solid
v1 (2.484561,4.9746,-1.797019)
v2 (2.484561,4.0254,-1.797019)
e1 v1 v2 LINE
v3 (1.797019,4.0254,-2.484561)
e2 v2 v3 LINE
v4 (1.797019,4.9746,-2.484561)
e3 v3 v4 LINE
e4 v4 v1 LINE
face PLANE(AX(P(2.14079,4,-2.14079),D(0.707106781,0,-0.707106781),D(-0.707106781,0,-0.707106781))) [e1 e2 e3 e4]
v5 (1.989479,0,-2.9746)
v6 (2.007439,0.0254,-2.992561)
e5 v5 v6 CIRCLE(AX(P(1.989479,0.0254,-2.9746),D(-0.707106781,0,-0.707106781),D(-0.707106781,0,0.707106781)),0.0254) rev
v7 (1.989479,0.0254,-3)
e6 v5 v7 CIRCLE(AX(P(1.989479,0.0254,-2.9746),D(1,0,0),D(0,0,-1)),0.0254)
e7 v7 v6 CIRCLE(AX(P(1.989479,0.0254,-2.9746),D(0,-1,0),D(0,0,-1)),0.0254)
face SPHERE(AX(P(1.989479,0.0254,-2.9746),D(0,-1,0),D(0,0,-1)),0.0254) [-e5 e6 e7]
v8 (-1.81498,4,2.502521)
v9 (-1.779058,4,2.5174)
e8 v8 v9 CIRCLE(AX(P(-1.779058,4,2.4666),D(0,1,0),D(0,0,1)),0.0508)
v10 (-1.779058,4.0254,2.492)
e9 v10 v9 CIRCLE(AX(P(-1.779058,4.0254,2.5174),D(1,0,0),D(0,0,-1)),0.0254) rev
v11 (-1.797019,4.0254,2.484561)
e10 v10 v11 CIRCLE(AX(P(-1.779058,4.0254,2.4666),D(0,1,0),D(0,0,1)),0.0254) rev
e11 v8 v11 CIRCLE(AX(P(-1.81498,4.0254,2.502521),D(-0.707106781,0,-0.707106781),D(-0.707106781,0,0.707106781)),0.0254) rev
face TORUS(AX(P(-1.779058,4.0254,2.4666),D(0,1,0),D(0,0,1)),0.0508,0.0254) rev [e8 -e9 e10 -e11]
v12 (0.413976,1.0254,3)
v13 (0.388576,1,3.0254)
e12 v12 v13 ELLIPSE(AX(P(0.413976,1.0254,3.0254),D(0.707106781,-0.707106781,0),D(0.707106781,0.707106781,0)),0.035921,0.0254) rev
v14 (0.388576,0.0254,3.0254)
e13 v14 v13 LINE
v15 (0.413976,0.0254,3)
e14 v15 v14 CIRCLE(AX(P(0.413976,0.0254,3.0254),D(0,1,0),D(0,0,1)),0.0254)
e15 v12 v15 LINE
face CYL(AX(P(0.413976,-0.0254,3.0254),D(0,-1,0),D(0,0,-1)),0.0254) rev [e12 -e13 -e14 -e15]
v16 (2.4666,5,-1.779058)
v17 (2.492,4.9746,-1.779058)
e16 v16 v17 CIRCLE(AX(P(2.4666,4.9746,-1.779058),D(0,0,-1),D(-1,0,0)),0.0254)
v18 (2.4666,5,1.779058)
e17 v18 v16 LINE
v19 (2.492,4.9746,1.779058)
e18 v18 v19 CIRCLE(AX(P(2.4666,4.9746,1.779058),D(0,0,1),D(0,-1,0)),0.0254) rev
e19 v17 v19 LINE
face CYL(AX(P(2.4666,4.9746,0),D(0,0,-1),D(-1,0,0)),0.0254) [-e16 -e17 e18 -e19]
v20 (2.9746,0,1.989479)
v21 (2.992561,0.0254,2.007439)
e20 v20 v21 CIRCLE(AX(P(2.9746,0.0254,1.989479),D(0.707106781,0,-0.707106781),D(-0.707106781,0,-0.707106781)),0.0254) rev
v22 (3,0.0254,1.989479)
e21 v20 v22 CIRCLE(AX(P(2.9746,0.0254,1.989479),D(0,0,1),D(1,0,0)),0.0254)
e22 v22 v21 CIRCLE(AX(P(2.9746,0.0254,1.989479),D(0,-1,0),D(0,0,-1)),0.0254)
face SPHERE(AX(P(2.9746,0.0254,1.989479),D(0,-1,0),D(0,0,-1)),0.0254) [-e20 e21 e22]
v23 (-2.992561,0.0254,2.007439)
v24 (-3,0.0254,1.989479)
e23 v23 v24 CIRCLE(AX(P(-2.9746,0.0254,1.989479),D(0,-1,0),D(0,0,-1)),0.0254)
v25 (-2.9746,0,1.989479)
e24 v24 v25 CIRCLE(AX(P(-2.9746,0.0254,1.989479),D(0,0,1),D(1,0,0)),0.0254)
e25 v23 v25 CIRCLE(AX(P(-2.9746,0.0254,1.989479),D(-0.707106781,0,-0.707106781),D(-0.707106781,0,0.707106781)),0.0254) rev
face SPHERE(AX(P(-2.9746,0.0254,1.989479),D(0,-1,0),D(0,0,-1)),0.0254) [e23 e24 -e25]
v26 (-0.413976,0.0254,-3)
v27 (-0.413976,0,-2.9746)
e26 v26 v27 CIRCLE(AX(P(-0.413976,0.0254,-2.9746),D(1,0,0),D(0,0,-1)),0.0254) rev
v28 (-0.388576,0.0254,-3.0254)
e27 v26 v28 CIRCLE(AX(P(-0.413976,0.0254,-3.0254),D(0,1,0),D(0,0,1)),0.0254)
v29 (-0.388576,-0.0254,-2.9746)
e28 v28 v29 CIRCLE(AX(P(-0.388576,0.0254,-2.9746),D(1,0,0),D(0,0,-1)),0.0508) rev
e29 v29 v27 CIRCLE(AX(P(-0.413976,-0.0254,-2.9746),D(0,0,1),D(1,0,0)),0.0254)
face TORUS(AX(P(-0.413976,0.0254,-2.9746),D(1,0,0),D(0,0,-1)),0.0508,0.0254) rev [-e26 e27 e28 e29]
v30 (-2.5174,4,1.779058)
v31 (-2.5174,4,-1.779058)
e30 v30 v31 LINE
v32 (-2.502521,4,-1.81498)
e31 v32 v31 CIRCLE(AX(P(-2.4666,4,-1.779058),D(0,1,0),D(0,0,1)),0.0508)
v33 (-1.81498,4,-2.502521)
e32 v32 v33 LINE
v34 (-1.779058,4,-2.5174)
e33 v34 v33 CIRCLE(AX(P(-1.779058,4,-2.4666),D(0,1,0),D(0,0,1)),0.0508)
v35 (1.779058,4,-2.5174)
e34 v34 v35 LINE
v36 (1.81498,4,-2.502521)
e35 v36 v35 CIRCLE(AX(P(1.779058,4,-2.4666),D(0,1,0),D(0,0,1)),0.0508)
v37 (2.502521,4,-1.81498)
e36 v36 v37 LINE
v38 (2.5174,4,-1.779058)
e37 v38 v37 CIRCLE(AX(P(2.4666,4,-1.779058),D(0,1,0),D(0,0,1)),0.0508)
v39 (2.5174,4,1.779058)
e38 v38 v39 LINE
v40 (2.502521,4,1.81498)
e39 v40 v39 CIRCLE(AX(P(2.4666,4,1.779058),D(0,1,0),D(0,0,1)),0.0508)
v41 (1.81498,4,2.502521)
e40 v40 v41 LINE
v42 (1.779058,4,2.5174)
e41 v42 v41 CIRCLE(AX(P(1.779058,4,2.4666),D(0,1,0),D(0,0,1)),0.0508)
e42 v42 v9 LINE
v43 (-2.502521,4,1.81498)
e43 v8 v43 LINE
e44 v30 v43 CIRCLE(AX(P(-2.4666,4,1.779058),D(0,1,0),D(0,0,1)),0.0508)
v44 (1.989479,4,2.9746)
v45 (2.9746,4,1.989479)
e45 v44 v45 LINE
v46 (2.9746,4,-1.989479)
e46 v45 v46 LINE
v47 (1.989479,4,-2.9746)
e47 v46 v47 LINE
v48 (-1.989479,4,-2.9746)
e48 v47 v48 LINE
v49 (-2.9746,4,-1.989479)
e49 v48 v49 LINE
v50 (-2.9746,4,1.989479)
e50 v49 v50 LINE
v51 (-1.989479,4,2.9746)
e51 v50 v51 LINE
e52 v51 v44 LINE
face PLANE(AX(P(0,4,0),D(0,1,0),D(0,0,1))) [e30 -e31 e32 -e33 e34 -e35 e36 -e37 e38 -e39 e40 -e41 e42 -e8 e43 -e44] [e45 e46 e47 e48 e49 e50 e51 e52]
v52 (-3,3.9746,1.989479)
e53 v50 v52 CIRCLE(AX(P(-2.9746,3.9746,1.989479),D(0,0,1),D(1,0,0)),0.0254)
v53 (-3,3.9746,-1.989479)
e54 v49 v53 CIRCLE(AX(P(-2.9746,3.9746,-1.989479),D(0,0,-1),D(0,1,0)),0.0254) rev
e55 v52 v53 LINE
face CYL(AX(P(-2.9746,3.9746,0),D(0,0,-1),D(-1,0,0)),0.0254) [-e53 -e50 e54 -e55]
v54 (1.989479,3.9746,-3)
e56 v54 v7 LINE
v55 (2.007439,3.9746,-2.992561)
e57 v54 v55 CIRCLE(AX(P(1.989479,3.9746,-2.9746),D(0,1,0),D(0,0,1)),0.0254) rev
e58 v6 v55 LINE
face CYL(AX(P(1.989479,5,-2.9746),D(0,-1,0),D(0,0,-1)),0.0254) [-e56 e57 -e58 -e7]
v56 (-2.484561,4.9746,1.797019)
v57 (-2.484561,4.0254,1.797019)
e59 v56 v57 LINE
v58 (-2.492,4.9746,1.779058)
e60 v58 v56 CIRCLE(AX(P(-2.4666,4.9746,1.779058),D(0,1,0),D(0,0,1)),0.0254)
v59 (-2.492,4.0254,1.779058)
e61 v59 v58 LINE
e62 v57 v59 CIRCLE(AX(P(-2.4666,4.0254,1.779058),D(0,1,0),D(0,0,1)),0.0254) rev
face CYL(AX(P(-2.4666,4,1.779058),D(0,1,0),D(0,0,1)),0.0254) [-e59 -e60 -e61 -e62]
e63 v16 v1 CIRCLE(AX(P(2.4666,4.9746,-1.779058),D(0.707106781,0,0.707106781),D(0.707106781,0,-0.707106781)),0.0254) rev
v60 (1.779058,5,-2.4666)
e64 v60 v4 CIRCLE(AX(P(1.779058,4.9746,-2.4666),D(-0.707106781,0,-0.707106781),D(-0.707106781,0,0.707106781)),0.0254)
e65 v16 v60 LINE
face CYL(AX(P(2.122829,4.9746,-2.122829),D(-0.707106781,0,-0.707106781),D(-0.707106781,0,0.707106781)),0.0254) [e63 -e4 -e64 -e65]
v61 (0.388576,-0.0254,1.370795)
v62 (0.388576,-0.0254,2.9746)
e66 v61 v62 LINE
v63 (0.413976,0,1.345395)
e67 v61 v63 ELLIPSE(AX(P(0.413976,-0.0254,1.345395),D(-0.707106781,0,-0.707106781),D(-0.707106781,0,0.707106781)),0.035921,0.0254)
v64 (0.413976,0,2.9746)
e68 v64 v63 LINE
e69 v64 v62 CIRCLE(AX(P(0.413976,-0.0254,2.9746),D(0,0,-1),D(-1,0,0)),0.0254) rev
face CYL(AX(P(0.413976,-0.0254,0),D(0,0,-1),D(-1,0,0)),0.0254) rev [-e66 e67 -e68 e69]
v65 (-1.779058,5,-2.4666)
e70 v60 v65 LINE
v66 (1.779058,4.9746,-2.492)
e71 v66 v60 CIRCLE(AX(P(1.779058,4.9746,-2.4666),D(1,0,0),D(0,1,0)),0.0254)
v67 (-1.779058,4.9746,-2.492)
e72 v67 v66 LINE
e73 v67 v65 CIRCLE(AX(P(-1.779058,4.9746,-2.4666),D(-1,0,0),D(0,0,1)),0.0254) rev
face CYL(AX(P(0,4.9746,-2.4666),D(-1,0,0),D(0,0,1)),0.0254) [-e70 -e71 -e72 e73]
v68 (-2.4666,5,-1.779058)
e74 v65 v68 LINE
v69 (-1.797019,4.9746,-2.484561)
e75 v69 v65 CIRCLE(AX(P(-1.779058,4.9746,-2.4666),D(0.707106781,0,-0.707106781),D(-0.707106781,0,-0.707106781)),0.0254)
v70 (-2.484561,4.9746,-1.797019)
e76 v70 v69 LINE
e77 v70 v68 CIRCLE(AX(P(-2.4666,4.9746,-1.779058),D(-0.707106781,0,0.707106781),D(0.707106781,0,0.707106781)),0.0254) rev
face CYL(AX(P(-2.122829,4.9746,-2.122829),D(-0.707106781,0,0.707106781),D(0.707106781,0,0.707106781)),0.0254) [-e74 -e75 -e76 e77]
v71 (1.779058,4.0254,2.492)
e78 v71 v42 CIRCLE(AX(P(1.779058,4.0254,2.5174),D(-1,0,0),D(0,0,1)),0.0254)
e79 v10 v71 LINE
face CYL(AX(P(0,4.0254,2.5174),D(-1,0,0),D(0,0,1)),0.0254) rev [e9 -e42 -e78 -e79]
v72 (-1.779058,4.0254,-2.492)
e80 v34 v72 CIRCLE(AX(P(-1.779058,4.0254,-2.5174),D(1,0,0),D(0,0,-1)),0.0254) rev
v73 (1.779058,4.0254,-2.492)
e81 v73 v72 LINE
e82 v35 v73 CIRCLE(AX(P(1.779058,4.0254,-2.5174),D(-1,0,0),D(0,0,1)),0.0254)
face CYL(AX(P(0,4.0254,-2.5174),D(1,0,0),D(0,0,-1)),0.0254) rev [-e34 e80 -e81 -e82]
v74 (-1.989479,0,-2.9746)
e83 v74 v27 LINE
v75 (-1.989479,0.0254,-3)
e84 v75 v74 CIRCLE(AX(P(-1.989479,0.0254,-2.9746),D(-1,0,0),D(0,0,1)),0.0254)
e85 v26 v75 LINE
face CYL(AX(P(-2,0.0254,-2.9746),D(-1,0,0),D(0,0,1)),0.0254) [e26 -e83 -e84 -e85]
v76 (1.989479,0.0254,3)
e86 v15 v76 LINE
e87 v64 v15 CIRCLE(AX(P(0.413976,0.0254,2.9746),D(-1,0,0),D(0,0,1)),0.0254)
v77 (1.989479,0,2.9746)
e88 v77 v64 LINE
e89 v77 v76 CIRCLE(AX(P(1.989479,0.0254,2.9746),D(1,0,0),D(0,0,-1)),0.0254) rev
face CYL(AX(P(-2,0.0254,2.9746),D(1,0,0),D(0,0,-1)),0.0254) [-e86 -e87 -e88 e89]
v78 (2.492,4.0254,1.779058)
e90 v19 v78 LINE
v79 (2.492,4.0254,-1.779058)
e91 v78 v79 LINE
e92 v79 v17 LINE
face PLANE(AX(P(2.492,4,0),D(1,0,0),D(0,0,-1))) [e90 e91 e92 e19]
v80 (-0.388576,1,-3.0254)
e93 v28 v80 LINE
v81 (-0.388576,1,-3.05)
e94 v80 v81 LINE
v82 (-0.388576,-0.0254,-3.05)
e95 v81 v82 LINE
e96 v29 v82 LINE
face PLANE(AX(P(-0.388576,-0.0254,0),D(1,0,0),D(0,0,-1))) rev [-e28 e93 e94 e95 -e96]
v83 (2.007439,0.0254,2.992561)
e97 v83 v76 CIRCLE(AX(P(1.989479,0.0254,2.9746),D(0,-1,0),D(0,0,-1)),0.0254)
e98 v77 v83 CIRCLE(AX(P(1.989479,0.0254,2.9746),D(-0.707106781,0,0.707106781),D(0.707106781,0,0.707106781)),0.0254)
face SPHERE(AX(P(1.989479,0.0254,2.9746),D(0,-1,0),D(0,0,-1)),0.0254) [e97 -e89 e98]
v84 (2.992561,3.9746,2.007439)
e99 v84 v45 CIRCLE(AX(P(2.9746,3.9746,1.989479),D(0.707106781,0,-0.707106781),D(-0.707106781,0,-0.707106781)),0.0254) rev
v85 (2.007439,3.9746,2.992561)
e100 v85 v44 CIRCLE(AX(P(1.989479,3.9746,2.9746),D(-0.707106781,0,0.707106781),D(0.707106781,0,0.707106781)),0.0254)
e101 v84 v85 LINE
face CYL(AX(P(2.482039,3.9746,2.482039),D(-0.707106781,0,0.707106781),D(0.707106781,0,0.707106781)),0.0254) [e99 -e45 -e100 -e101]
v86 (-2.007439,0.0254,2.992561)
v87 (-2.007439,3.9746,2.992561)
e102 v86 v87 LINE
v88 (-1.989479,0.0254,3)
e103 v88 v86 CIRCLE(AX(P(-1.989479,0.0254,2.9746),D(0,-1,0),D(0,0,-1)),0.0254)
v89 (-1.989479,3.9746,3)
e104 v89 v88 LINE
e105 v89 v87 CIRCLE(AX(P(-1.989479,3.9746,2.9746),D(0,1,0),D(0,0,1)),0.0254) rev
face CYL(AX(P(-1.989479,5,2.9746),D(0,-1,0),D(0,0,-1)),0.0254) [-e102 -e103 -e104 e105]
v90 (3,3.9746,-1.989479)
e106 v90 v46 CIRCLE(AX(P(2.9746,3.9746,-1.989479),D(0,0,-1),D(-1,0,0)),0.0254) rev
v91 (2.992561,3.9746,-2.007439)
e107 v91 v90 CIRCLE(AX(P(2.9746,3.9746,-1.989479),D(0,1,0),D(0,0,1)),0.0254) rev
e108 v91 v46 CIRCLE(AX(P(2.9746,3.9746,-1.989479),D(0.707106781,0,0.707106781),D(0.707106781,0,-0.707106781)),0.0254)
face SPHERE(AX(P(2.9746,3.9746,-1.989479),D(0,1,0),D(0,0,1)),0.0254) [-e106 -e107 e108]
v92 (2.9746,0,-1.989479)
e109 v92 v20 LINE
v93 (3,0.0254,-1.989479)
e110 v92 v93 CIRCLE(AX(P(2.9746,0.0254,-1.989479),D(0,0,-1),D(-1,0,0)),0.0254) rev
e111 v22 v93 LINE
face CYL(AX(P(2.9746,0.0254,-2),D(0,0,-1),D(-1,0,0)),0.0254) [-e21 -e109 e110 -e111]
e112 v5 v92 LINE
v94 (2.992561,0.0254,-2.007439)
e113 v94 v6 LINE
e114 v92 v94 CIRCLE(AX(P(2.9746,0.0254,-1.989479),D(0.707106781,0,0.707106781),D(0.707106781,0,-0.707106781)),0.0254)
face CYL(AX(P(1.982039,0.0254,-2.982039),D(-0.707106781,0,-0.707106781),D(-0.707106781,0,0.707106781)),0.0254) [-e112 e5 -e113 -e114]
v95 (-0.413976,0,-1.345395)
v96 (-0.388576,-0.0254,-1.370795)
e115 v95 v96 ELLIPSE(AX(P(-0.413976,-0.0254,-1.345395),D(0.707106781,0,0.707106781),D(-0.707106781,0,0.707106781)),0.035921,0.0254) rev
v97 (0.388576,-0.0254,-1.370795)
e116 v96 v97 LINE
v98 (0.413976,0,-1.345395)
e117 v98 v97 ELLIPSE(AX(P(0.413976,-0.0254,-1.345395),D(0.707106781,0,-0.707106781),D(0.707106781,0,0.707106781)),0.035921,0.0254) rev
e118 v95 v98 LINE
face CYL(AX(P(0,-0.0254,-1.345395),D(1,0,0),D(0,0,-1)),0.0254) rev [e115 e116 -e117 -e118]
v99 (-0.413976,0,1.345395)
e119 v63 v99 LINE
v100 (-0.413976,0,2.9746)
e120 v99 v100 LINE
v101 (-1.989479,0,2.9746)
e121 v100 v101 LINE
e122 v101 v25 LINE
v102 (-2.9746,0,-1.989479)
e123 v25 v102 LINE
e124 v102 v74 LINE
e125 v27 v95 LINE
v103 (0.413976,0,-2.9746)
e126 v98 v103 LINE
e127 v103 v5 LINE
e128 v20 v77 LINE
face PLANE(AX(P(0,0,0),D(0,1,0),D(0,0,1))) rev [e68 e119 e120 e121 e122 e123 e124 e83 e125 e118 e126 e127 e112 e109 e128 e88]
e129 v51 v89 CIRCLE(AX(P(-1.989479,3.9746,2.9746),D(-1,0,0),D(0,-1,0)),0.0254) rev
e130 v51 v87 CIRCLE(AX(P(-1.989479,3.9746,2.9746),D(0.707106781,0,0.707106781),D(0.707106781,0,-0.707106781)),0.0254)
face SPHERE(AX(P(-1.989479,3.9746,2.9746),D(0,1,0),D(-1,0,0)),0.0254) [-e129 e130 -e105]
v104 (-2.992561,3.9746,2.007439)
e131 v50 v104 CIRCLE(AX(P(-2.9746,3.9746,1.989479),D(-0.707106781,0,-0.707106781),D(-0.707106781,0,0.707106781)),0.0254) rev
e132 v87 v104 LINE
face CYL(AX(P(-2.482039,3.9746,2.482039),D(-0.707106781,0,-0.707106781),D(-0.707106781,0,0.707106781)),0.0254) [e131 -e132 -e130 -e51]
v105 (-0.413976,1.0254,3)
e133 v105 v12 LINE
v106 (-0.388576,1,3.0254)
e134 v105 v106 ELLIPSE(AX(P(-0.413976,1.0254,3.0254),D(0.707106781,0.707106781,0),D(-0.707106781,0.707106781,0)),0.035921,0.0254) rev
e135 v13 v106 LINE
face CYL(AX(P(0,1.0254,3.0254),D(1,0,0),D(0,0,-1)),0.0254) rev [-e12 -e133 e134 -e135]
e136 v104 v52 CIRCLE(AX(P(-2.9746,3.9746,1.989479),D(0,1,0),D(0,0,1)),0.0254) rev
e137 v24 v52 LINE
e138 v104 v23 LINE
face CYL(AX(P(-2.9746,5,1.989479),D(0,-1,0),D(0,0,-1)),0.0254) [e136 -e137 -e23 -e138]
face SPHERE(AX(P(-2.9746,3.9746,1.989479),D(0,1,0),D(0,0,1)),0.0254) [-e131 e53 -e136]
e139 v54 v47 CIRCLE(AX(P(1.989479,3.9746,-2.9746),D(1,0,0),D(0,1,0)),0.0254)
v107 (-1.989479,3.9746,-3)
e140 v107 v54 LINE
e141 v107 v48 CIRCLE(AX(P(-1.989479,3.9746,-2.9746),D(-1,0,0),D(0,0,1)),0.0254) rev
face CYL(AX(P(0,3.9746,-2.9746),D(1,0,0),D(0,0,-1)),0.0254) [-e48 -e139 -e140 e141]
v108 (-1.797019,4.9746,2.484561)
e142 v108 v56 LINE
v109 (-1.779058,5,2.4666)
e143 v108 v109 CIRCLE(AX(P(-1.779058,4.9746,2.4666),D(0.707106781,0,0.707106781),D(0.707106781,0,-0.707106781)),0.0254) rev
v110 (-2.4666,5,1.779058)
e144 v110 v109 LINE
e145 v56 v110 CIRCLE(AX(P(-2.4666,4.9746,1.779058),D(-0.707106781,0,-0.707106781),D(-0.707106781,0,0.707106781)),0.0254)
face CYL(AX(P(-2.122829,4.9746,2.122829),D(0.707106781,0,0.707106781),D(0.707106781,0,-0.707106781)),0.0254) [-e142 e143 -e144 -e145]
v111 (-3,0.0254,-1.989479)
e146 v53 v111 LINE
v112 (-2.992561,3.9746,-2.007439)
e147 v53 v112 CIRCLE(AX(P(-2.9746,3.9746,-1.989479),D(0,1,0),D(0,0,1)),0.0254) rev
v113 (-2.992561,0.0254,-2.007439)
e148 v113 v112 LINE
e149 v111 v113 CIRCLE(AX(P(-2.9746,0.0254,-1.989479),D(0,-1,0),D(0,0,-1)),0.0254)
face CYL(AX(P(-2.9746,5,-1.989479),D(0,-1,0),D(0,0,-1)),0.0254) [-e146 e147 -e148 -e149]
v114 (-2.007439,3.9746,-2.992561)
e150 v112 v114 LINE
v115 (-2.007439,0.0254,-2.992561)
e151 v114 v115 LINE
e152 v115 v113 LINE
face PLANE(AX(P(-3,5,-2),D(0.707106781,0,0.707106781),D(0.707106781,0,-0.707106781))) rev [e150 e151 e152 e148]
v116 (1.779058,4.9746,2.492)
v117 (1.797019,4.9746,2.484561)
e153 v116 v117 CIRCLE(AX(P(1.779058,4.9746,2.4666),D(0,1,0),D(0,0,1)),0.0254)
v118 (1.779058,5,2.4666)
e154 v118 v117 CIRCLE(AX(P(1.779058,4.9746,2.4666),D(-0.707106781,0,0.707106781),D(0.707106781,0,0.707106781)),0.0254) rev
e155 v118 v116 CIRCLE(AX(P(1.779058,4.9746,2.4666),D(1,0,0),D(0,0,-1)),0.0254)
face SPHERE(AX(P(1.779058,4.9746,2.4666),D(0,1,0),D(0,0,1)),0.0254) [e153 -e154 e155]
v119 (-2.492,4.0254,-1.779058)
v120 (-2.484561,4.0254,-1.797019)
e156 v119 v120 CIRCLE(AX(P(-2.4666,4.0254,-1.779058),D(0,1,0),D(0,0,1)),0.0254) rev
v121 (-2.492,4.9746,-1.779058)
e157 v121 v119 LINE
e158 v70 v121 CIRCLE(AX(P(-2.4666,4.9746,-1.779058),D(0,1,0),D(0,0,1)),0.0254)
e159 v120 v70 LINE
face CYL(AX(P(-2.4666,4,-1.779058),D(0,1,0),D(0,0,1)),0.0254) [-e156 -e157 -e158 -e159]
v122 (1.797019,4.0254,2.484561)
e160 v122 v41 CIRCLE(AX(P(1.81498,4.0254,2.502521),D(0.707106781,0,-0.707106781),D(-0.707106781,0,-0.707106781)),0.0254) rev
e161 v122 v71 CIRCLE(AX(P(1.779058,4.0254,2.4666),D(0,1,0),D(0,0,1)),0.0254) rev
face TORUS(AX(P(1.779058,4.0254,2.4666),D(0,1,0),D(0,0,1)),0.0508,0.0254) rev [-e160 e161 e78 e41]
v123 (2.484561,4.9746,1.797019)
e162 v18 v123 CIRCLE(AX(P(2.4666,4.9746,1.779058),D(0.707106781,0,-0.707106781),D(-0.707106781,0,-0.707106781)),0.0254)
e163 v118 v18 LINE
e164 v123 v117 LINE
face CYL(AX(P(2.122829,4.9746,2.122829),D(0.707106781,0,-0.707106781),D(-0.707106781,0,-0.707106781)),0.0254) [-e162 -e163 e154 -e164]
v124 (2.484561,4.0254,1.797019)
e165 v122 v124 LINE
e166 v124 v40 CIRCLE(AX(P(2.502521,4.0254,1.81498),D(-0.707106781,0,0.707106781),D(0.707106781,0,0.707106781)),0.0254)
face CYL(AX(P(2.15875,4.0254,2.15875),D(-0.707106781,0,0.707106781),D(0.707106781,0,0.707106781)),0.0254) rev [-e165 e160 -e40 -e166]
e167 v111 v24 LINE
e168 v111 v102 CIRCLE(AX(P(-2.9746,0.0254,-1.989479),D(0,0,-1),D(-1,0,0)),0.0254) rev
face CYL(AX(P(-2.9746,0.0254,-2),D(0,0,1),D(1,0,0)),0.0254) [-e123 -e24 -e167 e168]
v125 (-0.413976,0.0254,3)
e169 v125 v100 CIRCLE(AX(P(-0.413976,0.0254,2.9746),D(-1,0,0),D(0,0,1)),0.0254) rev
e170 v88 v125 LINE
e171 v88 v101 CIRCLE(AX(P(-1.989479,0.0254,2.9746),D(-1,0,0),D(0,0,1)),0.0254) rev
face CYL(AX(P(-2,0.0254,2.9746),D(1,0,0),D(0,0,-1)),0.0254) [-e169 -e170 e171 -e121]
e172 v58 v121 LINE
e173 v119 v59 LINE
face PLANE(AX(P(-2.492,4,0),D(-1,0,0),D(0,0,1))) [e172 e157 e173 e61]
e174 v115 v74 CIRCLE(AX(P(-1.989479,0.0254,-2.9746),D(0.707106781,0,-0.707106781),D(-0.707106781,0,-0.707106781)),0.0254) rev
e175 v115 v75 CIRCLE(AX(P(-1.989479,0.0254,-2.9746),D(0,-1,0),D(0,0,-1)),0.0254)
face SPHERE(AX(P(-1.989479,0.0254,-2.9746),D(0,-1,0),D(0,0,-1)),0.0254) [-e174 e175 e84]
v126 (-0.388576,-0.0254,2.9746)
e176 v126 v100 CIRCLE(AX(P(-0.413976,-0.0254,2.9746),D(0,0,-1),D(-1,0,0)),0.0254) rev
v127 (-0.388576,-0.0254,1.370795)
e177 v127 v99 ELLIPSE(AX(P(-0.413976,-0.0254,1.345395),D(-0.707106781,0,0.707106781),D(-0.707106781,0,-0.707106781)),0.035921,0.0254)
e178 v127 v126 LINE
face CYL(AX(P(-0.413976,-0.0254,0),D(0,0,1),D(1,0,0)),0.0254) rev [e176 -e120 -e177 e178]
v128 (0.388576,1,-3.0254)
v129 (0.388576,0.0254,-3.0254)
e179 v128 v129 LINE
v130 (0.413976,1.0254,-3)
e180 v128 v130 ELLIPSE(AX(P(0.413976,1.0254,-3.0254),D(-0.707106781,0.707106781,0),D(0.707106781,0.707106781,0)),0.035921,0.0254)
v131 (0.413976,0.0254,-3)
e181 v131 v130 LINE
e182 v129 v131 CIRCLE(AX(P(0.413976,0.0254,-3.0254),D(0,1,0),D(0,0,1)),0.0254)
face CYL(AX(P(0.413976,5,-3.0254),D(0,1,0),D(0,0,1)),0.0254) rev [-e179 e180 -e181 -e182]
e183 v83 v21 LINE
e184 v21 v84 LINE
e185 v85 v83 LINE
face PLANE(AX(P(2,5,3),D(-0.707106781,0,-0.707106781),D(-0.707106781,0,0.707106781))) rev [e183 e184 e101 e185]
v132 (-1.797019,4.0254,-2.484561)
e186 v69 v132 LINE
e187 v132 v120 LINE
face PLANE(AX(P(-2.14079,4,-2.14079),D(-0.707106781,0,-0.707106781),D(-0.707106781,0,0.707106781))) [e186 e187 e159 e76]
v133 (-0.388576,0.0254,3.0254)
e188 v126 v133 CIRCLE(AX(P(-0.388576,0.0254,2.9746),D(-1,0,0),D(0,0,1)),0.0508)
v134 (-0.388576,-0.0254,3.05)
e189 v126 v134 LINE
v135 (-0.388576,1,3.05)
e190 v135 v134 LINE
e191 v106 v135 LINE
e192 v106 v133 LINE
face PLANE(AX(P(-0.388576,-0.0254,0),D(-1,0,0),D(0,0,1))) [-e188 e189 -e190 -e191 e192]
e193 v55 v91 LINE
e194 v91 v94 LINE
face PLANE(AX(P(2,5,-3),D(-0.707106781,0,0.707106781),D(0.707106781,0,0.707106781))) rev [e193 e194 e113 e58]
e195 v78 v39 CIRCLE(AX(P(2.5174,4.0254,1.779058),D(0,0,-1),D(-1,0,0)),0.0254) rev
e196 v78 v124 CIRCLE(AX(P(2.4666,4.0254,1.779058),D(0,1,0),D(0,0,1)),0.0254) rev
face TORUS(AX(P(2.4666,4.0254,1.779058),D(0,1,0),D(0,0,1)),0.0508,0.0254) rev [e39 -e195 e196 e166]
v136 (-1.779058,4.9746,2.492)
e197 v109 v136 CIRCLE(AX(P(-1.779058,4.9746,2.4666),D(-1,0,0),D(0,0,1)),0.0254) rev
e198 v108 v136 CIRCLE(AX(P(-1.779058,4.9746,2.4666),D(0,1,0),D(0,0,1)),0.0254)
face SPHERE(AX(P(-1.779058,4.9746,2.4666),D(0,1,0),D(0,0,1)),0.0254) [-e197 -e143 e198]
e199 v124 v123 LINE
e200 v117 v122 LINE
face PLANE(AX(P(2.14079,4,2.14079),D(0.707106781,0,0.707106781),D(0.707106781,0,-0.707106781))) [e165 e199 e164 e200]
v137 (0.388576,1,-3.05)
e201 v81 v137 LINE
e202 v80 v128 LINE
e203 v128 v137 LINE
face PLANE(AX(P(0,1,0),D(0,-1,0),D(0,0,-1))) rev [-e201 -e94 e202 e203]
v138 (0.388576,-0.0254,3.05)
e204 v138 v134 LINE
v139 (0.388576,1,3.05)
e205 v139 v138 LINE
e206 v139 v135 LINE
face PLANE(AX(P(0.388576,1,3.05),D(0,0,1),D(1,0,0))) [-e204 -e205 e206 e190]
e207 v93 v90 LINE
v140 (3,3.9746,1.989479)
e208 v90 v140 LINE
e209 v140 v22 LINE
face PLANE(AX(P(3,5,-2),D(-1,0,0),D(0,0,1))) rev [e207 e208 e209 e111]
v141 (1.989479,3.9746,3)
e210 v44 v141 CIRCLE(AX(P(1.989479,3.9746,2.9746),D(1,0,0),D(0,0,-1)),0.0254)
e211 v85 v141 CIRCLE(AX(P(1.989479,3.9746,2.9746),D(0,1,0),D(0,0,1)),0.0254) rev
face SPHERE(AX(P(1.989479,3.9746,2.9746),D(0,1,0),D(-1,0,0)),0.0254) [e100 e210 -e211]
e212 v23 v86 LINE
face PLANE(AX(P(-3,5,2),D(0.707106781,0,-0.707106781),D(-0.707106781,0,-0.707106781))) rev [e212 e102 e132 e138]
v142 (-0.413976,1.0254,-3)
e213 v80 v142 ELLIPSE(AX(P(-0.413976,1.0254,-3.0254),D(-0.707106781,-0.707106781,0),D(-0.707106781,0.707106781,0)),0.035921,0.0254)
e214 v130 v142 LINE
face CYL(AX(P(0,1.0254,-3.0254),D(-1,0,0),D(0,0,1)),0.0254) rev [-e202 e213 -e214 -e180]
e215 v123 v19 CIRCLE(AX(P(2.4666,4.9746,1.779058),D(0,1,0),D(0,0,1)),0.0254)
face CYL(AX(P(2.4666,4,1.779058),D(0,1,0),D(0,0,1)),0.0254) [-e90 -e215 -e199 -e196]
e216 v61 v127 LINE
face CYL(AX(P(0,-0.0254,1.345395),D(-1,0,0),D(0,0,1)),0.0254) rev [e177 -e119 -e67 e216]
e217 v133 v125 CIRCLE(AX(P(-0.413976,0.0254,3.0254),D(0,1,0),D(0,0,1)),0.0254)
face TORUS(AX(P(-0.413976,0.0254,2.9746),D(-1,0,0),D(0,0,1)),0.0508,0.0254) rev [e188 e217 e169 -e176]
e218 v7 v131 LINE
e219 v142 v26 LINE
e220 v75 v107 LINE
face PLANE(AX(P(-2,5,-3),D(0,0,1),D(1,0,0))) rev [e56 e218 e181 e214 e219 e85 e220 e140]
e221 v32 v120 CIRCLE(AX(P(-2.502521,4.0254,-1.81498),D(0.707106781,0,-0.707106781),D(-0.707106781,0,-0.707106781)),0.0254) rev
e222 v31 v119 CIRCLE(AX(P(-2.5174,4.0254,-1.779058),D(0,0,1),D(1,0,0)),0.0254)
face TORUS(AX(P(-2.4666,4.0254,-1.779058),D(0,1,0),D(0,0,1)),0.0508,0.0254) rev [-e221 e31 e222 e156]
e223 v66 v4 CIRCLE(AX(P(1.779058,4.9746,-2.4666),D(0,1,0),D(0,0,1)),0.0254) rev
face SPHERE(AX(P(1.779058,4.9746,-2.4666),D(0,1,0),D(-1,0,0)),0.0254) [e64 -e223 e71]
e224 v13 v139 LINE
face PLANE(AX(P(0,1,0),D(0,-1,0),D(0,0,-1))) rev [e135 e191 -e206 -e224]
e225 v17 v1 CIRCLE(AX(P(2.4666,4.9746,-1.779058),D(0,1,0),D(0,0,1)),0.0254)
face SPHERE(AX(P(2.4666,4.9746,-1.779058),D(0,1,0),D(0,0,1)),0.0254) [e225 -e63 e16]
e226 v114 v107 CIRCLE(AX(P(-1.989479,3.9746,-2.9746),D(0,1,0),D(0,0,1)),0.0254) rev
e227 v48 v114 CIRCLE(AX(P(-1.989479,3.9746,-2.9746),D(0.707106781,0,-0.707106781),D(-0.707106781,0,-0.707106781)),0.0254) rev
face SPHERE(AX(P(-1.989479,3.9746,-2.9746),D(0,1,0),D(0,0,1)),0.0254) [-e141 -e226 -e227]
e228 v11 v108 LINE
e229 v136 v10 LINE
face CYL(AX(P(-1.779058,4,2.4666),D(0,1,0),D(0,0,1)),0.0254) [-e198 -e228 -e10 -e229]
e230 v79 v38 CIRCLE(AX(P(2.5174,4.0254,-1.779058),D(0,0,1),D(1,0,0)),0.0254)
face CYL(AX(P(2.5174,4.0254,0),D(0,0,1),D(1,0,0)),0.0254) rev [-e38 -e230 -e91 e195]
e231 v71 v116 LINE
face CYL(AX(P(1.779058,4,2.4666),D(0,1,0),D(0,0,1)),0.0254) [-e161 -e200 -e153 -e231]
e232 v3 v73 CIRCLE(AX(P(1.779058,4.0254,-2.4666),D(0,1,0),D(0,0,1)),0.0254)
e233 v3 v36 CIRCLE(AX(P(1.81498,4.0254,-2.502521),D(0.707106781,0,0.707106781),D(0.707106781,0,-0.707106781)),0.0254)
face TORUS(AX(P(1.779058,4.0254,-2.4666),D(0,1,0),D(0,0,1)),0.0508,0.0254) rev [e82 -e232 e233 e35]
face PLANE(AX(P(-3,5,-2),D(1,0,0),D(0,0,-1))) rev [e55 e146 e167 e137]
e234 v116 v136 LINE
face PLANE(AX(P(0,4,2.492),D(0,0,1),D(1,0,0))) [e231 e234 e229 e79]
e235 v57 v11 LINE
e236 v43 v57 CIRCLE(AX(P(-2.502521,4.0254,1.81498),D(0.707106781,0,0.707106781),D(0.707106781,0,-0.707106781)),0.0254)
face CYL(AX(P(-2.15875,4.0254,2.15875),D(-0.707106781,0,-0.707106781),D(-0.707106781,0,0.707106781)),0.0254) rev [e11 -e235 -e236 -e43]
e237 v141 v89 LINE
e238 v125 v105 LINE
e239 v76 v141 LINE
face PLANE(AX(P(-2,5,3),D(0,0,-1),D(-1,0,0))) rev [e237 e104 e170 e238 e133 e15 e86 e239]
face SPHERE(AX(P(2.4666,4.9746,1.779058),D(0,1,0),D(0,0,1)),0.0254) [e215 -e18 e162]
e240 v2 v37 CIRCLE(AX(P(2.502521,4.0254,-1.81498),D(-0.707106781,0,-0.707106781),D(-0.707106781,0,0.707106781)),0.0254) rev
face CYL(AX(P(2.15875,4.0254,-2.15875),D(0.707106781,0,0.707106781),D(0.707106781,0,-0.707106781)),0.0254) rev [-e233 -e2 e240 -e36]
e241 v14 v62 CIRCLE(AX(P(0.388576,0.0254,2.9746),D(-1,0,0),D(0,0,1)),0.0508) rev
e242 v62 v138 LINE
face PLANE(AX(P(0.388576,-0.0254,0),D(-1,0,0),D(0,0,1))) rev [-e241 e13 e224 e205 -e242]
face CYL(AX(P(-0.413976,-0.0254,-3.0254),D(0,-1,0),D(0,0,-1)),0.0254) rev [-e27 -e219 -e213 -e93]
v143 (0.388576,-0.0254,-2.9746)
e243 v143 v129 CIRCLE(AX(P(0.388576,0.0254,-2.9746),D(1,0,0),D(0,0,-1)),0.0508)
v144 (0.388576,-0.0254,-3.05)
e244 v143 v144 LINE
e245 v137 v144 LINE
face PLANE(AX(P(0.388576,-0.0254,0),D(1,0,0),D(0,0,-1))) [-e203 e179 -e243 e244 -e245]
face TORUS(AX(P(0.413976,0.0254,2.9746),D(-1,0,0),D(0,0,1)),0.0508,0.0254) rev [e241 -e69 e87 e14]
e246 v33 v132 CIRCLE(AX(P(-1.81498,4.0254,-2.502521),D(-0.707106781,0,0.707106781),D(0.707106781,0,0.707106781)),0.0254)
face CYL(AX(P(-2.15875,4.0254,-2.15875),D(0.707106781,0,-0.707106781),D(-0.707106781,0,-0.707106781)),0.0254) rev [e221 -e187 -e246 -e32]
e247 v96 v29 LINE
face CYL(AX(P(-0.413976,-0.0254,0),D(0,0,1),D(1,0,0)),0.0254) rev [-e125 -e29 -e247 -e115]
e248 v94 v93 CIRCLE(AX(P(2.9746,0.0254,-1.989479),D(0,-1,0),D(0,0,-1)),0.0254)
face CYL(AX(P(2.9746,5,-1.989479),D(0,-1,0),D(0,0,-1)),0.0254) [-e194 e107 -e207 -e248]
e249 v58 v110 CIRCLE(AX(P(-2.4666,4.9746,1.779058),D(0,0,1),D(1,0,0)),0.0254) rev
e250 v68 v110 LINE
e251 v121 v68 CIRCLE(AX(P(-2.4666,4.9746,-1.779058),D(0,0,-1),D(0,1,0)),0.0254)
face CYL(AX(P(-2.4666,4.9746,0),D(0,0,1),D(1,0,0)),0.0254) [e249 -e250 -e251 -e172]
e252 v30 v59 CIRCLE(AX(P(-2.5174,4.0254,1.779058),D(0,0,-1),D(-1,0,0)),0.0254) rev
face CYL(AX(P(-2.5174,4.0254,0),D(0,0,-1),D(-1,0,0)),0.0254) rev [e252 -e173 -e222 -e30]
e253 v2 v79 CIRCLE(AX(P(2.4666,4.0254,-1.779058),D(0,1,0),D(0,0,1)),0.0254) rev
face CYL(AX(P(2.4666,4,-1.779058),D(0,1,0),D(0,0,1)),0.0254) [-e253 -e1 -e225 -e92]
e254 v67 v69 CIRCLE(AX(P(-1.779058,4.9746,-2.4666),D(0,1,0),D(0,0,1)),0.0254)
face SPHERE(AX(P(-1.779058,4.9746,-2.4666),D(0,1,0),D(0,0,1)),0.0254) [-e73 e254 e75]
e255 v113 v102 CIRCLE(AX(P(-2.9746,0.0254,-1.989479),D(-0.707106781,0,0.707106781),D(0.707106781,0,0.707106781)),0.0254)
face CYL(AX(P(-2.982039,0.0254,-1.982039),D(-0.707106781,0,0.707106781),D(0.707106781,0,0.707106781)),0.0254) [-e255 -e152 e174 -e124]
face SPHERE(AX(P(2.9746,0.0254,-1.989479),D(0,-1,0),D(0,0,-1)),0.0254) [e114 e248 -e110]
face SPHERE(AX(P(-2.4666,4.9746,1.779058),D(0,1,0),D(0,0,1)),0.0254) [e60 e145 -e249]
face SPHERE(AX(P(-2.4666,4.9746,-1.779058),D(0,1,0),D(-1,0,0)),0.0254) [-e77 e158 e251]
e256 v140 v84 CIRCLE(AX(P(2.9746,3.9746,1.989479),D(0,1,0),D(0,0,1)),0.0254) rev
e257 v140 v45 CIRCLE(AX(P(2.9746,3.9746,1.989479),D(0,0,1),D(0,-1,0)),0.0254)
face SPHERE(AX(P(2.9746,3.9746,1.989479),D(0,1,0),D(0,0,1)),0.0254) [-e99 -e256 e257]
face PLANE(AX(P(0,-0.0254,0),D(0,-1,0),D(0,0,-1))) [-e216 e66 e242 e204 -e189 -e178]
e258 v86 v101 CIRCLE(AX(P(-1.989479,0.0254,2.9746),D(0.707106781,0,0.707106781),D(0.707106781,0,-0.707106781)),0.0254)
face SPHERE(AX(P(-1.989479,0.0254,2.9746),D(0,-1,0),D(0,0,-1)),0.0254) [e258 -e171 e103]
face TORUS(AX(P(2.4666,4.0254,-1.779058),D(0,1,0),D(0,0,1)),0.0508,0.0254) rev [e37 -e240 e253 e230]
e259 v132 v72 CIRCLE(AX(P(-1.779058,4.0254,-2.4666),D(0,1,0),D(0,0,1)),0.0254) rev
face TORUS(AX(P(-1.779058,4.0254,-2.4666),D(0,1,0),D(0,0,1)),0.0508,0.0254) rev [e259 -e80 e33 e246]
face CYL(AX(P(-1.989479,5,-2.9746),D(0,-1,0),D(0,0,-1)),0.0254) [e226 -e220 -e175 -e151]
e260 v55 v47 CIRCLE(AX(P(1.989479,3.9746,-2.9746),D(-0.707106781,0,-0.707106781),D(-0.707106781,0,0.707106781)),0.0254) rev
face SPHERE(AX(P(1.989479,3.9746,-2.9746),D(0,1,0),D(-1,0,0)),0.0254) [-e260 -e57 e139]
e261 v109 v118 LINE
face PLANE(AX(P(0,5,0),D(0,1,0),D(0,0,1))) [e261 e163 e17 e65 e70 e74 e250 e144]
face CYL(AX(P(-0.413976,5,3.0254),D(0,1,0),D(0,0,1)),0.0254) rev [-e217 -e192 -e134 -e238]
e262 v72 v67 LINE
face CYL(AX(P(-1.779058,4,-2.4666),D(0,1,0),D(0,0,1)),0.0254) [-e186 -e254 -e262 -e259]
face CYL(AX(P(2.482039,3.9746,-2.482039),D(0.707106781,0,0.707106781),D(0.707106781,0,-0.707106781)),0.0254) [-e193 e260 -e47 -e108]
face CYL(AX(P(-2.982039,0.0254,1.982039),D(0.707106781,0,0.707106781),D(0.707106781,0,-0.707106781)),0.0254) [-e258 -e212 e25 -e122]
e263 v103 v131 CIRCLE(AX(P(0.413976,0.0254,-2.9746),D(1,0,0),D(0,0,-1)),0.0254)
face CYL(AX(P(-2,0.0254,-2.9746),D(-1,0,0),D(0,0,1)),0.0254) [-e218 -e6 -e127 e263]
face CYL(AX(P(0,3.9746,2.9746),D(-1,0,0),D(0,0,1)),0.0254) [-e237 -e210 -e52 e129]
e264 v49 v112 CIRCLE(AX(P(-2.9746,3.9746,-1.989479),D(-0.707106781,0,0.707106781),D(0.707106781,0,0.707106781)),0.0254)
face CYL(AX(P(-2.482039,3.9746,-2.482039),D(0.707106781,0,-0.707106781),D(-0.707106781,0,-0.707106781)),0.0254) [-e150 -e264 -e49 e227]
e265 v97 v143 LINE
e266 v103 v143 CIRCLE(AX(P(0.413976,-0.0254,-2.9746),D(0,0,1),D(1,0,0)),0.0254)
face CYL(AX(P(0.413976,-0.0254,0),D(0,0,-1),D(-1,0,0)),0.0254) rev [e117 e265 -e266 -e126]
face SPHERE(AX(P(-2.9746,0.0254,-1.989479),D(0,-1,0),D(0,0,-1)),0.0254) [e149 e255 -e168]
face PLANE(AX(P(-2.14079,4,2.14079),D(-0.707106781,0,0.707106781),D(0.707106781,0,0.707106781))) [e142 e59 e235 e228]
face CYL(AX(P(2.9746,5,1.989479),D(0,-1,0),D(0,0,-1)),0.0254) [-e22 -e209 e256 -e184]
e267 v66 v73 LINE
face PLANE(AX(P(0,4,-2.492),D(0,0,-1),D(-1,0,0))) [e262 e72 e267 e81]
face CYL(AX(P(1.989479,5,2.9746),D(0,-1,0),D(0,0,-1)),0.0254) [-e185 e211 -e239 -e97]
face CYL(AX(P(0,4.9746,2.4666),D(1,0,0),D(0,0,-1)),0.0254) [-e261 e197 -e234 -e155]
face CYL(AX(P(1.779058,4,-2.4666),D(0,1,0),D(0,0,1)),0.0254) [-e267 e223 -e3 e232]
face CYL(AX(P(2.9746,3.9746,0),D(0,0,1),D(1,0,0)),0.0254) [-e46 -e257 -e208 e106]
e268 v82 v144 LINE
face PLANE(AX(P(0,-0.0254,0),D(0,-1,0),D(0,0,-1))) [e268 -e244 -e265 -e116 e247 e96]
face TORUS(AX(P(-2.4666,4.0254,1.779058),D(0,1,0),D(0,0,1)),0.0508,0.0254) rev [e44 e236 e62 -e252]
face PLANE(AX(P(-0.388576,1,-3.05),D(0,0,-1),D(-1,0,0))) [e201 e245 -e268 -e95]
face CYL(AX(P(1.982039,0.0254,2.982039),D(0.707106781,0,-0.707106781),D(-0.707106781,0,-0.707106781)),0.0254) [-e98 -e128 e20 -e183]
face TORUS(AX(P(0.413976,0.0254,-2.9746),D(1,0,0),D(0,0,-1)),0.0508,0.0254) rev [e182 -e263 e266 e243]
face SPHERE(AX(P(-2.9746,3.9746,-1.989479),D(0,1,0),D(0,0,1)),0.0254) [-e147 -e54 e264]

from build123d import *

# Parameters (mm, degrees)
BOSS_EXTRUDE1_DEPTH      = 5
CUT_EXTRUDE1_DEPTH       = 1
BOSS_EXTRUDE2_DEPTH      = 0.0254
BOSS_EXTRUDE2_DEPTH_BACK = 1
SKETCH3_W                = 0.777152918
SKETCH3_H                = 1.679205413
FILLET1_R                = 0.0254


with BuildPart() as part:
    # Sketch1 → Boss-Extrude1 (new body)
    with BuildSketch(Plane(origin=(0, 0, 0), x_dir=(1, 0, 0), z_dir=(0, 1, 0))):
        Polygon((-3, 2), (-2, 3), (2, 3), (3, 2), (3, -2), (2, -3), (-2, -3), (-3, -2), align=None)
    extrude(amount=BOSS_EXTRUDE1_DEPTH)

    # Sketch2 → Cut-Extrude1 (cut)
    with BuildSketch(Plane(origin=(0, 5, 0), x_dir=(1, 0, 0), z_dir=(0, 1, 0))):
        Polygon((3, -2), (3, 2), (2, 3), (-2, 3), (-3, 2), (-3, -2), (-2, -3), (2, -3), align=None)
        Polygon((2.492, -1.78957951), (2.492, 1.78957951), (1.78957951, 2.492), (-1.78957951, 2.492), (-2.492, 1.78957951), (-2.492, -1.78957951), (-1.78957951, -2.492), (1.78957951, -2.492), align=None, mode=Mode.SUBTRACT)
    extrude(amount=-CUT_EXTRUDE1_DEPTH, mode=Mode.SUBTRACT)

    # Sketch3 → Boss-Extrude2 (add, two sides: drawn at the far end of the back side and taken through both)
    with BuildSketch(Plane.XZ.offset(-BOSS_EXTRUDE2_DEPTH_BACK)):
        with Locations((0, 2.210397294)):
            Rectangle(SKETCH3_W, SKETCH3_H)
        with Locations((0, -2.210397294)):
            Rectangle(SKETCH3_W, SKETCH3_H)
    extrude(amount=BOSS_EXTRUDE2_DEPTH + BOSS_EXTRUDE2_DEPTH_BACK)

    # Fillet1
    fillet1_edges = [part.edges().sort_by_distance(p)[0] for p in [
        (0.388576459, 0, 2.185397293),
        (0.388576459, 0, -2.185397293),
        (0, 0, -1.370794587),
        (-0.388576459, 0, -2.185397293),
        (-0.388576459, 0, 2.185397293),
        (0, 0, 1.370794587),
        (1.78957951, 4.5, -2.492),
        (2.492, 4.5, -1.78957951),
        (2.492, 4.5, 1.78957951),
        (1.78957951, 4.5, 2.492),
        (-1.78957951, 4.5, 2.492),
        (-2.492, 4.5, 1.78957951),
        (-2.492, 4.5, -1.78957951),
        (-1.78957951, 4.5, -2.492),
        (0, 5, 2.492),
        (-2.140789755, 5, 2.140789755),
        (-2.492, 5, 0),
        (-2.140789755, 5, -2.140789755),
        (0, 5, -2.492),
        (2.140789755, 5, -2.140789755),
        (2.492, 5, 0),
        (2.140789755, 5, 2.140789755),
        (2.140789755, 4, -2.140789755),
        (0, 4, -2.492),
        (-2.140789755, 4, -2.140789755),
        (-2.492, 4, 0),
        (-2.140789755, 4, 2.140789755),
        (0, 4, 2.492),
        (2.140789755, 4, 2.140789755),
        (2.492, 4, 0),
        (0, 4, -3),
        (-1.19428823, 0, -3),
        (-0.388576459, 0.5, -3),
        (0, 1, -3),
        (0.388576459, 0.5, -3),
        (1.19428823, 0, -3),
        (-2.5, 0, -2.5),
        (-2, 2, -3),
        (-2.5, 4, -2.5),
        (-3, 0, 0),
        (-3, 2, -2),
        (-3, 4, 0),
        (-2.5, 0, 2.5),
        (-3, 2, 2),
        (-2.5, 4, 2.5),
        (-2, 2, 3),
        (0, 4, 3),
        (1.19428823, 0, 3),
        (0.388576459, 0.5, 3),
        (0, 1, 3),
        (-0.388576459, 0.5, 3),
        (-1.19428823, 0, 3),
        (2.5, 0, 2.5),
        (2, 2, 3),
        (2.5, 4, 2.5),
        (3, 0, 0),
        (3, 2, 2),
        (3, 4, 0),
        (2, 2, -3),
        (2.5, 0, -2.5),
        (3, 2, -2),
        (2.5, 4, -2.5),
    ]]
    fillet(fillet1_edges, radius=FILLET1_R - 0.0001)  # a hair under: the kernel refuses the full size


solid = part.part
